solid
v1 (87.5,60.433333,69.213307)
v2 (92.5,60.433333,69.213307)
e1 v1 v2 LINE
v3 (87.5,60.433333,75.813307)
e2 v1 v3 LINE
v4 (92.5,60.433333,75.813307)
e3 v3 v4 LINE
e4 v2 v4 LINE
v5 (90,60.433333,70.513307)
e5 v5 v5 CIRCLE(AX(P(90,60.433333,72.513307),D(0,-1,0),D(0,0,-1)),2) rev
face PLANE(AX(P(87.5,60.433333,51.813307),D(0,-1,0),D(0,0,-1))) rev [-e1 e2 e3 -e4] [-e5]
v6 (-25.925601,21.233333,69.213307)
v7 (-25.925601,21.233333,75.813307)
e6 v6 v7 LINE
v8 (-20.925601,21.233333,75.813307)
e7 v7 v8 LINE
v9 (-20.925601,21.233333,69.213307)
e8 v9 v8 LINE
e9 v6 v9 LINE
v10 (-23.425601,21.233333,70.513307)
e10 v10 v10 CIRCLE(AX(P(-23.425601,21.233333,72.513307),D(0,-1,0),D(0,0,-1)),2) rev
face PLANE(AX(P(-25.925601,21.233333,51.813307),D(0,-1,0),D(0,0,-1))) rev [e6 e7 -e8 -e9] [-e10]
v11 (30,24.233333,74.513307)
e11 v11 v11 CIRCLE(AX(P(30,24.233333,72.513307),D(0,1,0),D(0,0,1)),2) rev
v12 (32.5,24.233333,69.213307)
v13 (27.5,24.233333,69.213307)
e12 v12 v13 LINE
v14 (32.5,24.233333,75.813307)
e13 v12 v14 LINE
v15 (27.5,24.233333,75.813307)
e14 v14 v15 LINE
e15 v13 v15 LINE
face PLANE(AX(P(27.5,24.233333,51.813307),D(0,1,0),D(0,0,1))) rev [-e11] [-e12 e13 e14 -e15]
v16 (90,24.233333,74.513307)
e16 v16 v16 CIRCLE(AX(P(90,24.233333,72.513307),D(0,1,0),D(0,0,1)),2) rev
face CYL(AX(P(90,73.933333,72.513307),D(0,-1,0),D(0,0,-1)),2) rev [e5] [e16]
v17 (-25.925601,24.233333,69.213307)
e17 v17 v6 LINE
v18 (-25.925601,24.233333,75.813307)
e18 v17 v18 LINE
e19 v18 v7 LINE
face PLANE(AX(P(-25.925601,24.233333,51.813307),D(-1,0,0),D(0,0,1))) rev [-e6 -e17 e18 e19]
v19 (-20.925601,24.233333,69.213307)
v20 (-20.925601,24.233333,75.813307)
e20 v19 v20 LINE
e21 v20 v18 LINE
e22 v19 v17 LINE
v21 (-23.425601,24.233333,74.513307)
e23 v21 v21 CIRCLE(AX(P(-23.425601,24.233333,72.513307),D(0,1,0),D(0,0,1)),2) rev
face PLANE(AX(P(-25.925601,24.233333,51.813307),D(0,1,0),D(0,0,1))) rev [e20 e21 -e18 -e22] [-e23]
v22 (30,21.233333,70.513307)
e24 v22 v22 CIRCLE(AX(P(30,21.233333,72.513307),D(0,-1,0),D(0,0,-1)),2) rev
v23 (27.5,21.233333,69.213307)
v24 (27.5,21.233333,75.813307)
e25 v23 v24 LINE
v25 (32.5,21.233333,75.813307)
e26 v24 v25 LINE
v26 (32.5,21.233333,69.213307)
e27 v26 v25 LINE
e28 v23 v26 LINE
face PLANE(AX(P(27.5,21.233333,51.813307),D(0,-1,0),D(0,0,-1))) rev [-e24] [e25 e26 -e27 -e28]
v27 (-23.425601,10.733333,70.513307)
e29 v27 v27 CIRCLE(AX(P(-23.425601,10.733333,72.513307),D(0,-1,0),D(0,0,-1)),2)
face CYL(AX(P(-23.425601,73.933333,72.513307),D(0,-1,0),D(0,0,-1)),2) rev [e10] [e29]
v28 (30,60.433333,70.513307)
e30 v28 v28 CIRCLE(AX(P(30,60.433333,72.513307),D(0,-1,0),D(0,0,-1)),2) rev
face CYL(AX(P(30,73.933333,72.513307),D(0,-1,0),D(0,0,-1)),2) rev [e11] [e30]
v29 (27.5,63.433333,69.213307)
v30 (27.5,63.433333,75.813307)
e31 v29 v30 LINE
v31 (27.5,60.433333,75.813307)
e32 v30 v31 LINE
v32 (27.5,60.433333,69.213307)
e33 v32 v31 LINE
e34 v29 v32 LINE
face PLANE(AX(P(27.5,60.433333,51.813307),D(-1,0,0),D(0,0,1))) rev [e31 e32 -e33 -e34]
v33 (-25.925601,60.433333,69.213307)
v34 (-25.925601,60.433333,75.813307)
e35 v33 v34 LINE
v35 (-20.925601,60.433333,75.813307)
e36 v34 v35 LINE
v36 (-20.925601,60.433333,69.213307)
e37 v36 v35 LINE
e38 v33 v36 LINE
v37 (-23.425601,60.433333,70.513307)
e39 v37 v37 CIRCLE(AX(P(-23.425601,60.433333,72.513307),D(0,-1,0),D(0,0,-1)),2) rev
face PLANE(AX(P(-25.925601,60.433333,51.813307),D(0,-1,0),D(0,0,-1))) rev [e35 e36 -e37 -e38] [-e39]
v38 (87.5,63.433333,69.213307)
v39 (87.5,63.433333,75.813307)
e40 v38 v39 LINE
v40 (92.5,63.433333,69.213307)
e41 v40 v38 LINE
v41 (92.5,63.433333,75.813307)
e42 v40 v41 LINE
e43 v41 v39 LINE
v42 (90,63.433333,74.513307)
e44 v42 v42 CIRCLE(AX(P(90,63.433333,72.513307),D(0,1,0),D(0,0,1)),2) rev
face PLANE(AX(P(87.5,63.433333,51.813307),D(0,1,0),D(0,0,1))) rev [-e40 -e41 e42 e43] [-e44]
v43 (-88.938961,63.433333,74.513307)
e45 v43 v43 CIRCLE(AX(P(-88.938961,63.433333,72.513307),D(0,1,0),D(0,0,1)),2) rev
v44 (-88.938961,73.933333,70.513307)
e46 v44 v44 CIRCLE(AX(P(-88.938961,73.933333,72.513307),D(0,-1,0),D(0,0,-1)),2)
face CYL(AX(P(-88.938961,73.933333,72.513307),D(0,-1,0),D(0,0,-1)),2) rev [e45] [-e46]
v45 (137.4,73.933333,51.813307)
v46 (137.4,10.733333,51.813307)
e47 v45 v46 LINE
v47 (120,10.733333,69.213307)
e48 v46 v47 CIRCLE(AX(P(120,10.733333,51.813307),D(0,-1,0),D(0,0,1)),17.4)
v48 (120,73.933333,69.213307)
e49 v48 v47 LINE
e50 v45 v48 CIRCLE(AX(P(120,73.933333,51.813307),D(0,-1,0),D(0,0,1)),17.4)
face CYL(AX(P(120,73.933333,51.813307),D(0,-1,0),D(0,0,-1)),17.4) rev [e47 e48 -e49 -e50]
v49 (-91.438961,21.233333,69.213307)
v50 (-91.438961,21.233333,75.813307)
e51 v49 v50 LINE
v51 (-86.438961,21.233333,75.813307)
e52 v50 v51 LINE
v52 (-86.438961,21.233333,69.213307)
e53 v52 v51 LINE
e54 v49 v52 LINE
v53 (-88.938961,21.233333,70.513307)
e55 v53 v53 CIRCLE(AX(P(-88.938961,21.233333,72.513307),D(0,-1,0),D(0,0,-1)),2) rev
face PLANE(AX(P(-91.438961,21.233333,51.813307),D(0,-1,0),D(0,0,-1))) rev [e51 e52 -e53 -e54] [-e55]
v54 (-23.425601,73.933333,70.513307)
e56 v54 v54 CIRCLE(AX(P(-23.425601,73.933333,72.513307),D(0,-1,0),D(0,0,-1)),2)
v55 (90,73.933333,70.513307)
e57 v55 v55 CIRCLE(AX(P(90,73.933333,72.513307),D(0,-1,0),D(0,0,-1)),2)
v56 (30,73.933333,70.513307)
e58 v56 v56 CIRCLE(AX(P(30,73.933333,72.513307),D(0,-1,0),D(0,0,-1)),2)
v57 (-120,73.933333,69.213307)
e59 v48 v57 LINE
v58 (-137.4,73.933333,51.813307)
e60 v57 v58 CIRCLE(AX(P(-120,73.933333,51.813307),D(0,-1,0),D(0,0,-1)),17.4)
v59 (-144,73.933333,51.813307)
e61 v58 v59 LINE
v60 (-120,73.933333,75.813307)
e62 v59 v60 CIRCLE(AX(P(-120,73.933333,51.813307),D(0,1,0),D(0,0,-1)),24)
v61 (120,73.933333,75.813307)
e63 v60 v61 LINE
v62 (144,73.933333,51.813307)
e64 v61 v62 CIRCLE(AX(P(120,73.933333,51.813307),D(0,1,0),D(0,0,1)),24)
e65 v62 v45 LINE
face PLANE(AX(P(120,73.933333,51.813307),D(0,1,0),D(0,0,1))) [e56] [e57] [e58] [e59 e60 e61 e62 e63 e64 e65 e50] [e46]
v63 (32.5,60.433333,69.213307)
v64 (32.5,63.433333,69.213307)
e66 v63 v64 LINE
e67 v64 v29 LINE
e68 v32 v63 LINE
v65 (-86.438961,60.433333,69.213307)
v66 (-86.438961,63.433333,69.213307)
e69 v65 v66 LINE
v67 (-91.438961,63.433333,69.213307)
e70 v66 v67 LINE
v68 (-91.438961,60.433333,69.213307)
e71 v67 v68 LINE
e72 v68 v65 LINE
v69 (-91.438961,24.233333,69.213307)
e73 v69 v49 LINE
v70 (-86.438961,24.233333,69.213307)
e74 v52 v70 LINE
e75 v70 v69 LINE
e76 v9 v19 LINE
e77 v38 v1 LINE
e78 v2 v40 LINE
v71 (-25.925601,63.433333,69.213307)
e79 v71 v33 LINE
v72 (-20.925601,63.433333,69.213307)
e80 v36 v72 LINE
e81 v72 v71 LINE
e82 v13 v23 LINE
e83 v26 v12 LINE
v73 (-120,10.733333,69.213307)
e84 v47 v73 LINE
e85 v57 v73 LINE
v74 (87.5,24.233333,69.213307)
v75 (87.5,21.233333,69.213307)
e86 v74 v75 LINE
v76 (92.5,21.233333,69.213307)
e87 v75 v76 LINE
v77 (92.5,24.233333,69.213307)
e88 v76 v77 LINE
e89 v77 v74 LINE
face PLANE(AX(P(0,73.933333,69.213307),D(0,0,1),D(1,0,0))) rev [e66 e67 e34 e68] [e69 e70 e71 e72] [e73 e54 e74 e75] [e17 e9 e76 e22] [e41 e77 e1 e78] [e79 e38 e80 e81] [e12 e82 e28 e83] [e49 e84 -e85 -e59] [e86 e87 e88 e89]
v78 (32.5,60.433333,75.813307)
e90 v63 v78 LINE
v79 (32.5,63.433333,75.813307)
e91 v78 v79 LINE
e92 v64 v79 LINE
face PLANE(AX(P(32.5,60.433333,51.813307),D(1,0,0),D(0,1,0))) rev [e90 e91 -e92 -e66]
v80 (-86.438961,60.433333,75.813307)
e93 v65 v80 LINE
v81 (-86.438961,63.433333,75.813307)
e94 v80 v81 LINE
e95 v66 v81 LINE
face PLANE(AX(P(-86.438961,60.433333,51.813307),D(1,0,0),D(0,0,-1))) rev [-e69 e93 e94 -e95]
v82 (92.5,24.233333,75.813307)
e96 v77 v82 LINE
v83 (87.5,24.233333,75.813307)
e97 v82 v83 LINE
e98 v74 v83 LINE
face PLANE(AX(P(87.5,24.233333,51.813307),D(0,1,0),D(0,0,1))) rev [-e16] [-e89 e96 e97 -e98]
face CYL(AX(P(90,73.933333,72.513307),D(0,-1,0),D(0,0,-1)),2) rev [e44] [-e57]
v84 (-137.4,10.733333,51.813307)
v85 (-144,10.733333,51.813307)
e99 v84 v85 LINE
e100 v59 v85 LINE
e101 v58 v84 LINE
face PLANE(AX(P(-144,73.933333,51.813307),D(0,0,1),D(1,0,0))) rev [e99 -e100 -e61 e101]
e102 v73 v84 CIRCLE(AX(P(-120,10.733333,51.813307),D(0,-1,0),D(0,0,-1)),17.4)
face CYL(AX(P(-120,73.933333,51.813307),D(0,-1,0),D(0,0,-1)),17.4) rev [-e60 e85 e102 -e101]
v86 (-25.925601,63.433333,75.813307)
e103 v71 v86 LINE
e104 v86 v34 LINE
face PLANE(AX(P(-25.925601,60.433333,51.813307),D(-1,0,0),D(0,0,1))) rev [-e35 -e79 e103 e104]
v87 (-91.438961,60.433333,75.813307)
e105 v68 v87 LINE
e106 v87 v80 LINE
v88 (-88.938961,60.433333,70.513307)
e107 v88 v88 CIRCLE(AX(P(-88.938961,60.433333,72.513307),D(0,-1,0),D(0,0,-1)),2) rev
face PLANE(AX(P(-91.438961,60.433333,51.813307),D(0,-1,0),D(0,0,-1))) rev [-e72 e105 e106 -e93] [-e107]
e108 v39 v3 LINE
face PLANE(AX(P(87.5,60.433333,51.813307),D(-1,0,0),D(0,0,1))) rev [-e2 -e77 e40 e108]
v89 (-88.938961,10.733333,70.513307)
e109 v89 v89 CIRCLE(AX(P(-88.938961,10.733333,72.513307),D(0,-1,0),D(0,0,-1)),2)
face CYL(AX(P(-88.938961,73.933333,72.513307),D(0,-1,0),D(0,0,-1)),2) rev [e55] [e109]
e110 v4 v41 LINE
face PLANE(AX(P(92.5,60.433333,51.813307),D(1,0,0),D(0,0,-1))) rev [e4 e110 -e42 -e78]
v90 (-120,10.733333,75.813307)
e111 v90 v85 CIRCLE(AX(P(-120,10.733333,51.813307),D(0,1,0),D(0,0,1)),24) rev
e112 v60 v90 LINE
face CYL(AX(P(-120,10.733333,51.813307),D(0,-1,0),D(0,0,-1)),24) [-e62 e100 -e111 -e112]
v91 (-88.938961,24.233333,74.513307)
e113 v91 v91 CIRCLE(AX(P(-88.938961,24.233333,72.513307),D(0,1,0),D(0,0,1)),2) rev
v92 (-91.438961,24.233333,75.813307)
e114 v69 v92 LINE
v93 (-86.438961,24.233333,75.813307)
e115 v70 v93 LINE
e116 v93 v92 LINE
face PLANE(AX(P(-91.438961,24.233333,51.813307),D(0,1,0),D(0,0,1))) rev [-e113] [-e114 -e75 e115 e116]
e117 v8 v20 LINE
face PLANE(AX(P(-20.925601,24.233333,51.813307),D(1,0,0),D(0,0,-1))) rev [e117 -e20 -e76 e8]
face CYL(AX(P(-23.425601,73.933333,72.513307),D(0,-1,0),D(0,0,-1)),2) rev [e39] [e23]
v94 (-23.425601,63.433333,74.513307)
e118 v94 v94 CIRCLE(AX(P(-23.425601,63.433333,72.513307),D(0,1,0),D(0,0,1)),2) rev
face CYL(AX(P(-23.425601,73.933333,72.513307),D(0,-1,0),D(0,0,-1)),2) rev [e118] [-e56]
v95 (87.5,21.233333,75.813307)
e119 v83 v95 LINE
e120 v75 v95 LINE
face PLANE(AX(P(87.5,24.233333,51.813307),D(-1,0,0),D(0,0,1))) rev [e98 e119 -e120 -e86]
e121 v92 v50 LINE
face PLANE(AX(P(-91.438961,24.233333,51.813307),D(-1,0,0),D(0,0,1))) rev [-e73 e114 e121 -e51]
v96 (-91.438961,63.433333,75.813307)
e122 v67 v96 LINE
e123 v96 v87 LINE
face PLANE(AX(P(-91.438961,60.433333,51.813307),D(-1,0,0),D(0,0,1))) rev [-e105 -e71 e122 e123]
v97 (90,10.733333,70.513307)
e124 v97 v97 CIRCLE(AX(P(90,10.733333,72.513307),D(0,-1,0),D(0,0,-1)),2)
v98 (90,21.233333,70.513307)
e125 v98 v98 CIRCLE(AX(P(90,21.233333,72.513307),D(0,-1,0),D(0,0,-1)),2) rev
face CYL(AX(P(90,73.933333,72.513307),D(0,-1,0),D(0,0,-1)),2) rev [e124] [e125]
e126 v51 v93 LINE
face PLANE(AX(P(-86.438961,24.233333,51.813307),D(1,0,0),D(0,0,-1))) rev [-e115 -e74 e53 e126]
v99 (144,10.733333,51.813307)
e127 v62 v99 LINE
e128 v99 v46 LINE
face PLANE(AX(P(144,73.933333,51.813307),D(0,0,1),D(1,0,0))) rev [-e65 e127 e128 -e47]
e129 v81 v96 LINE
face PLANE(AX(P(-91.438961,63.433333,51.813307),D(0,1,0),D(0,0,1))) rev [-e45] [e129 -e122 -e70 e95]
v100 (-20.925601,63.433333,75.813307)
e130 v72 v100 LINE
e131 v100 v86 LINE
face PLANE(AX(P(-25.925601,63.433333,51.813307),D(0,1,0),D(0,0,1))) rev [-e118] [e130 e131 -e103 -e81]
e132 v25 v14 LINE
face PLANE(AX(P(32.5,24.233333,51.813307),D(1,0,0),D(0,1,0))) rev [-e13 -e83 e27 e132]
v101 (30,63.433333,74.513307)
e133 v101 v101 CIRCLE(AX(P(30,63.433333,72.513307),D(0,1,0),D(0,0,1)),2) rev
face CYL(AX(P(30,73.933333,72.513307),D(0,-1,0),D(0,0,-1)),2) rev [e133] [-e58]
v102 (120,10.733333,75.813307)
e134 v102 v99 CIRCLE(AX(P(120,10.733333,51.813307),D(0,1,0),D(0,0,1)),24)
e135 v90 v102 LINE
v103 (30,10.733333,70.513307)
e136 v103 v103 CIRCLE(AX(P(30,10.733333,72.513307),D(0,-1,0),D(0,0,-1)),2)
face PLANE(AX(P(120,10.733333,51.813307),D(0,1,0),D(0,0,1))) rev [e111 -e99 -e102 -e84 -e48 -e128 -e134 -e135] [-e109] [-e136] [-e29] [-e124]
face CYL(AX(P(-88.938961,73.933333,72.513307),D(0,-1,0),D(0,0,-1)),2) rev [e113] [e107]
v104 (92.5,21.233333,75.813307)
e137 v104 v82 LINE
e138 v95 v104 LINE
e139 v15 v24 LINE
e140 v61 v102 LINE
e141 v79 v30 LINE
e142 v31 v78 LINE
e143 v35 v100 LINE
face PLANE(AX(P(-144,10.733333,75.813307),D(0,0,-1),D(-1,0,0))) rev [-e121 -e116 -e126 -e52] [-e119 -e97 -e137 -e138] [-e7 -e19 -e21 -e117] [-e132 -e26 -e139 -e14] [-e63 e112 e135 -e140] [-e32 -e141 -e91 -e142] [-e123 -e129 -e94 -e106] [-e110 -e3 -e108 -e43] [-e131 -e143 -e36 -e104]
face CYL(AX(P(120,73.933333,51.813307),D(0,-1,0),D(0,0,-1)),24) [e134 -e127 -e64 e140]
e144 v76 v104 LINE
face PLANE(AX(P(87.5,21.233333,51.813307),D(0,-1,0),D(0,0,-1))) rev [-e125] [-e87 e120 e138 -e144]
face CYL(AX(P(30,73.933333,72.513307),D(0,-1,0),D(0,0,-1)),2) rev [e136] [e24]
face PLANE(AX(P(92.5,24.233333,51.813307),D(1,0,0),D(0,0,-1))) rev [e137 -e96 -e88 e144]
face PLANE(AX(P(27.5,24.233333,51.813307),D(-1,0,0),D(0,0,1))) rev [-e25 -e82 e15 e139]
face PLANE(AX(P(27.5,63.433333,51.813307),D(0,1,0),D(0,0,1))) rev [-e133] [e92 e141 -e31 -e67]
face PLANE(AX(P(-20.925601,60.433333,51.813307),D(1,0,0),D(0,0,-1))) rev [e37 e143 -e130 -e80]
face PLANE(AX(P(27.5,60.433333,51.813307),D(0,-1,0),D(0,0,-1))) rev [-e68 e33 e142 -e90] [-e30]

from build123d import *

# Parameters (mm, degrees)
BOSS_EXTRUDE1_DEPTH      = 16
BOSS_EXTRUDE2_DEPTH      = 46.583974855
BOSS_EXTRUDE2_DEPTH_BACK = 46.58397486
SKETCH4_R                = 3.3
CUT_EXTRUDE1_DEPTH       = 32.2
CUT_EXTRUDE1_DEPTH_BACK  = 32.2
SKETCH5_R                = 3.3
SKETCH6_W                = 20
SKETCH6_H                = 11
BOSS_EXTRUDE3_DEPTH      = 30
CUT_EXTRUDE2_DEPTH       = 233.824504724
CUT_EXTRUDE2_DEPTH_BACK  = 233.824504724
SKETCH7_R                = 2
SKETCH8_W                = 40
SKETCH8_H                = 11
CUT_EXTRUDE3_DEPTH       = 40
SKETCH9_R                = 2
CUT_EXTRUDE4_DEPTH       = 40
FILLET1_R                = 20
BOSS_EXTRUDE4_DEPTH      = 52.66666667
SKETCH11_W               = 287.599331825
SKETCH11_H               = 200.78083169
CUT_EXTRUDE5_DEPTH       = 16
SCALE1_START             = 16
SCALE1_DEPTH             = 52.66666667
SCALE1_START_2           = 2.833333333
SCALE1_2_DEPTH           = 79.000000004
SKETCH15_W               = 527.18296214
SKETCH15_H               = 284.392361206
CUT_EXTRUDE9_DEPTH       = 200
SCALE2_SCALE             = 0.8
SKETCH23_R               = 2
CUT_EXTRUDE15_DEPTH      = 175.579201349
SKETCH25_R               = 2
CUT_EXTRUDE18_DEPTH      = 175.579201349
SKETCH28_W               = 5
SKETCH28_H               = 3
CUT_EXTRUDE19_DEPTH      = 164.640269427


# Read off the part's stored shape, not the designer's step: Scale1
with BuildPart() as part:
    # Sketch1 → Boss-Extrude1 (new body)
    with BuildSketch(Plane(origin=(0, 0, 0), x_dir=(1, 0, 0), z_dir=(0, 1, 0))):
        Polygon((-120, -37.5), (-120, -75), (0, -75), (0, 75), (-120, 75), (-120, 37.5), (-220, 37.5), (-220, -37.5), align=None)
    extrude(amount=BOSS_EXTRUDE1_DEPTH)

    # Sketch4 → Boss-Extrude2 (add, two sides: drawn at the far end of the back side and taken through both)
    # profile 1 of 2: a face of its own
    with BuildSketch(Plane.ZY.offset(170).offset(-BOSS_EXTRUDE2_DEPTH_BACK)):
        with BuildLine():
            Line((37.5, 16), (43.5, 16))
            ThreePointArc((43.5, 16), (51.5, 8), (43.5, 0))
            Line((43.5, 0), (37.5, 0))
            Line((37.5, 0), (37.5, 16))
        make_face()
        with Locations((43.5, 8)):
            Circle(SKETCH4_R, mode=Mode.SUBTRACT)
    # profile 2 of 2: a face of its own
    with BuildSketch(Plane.ZY.offset(170).offset(-BOSS_EXTRUDE2_DEPTH_BACK)):
        with BuildLine():
            Line((-37.5, 0), (-43.5, 0))
            ThreePointArc((-43.5, 0), (-51.5, 8), (-43.5, 16))
            Line((-43.5, 16), (-37.5, 16))
            Line((-37.5, 16), (-37.5, 0))
        make_face()
        with Locations((-43.5, 8)):
            Circle(SKETCH4_R, mode=Mode.SUBTRACT)
    extrude(amount=BOSS_EXTRUDE2_DEPTH + BOSS_EXTRUDE2_DEPTH_BACK)

    # Sketch5 → Cut-Extrude1 (cut, two sides: drawn at the far end of the back side and taken through both)
    # profile 1 of 2: a face of its own
    with BuildSketch(Plane.ZY.offset(170).offset(-CUT_EXTRUDE1_DEPTH_BACK)):
        with BuildLine():
            Line((-43.5, 16), (-37.5, 16))
            Line((-37.5, 16), (-37.5, 0))
            Line((-37.5, 0), (-43.5, 0))
            ThreePointArc((-43.5, 0), (-51.5, 8), (-43.5, 16))
        make_face()
        with Locations((-43.5, 8)):
            Circle(SKETCH5_R, mode=Mode.SUBTRACT)
    # profile 2 of 2: a face of its own
    with BuildSketch(Plane.ZY.offset(170).offset(-CUT_EXTRUDE1_DEPTH_BACK)):
        with BuildLine():
            Line((37.5, 0), (43.5, 0))
            ThreePointArc((43.5, 0), (51.5, 8), (43.5, 16))
            Line((43.5, 16), (37.5, 16))
            Line((37.5, 16), (37.5, 0))
        make_face()
        with Locations((43.5, 8)):
            Circle(SKETCH5_R, mode=Mode.SUBTRACT)
    extrude(amount=CUT_EXTRUDE1_DEPTH + CUT_EXTRUDE1_DEPTH_BACK, mode=Mode.SUBTRACT)

    # Sketch6 → Boss-Extrude3 (add)
    with BuildSketch(Plane(origin=(0, 0, 0), x_dir=(0, 0, -1), z_dir=(1, 0, 0))):
        with Locations((-50, 8)):
            Rectangle(SKETCH6_W, SKETCH6_H)
        with Locations((50, 8)):
            Rectangle(SKETCH6_W, SKETCH6_H)
    extrude(amount=BOSS_EXTRUDE3_DEPTH)

    # Sketch7 → Cut-Extrude2 (cut, two sides: drawn at the far end of the back side and taken through both)
    with BuildSketch(Plane(origin=(0, 13.5, 0), x_dir=(1, 0, 0), z_dir=(0, 1, 0)).offset(-CUT_EXTRUDE2_DEPTH_BACK)):
        with Locations(Location((22.5, 50, 0), (0, 0, 270))):
            Circle(SKETCH7_R)
        with Locations(Location((22.5, -50, 0), (0, 0, 270))):
            Circle(SKETCH7_R)
    extrude(amount=CUT_EXTRUDE2_DEPTH + CUT_EXTRUDE2_DEPTH_BACK, mode=Mode.SUBTRACT)

    # Sketch8 → Cut-Extrude3 (cut)
    with BuildSketch(Plane(origin=(0, 0, 0), x_dir=(0, 0, -1), z_dir=(1, 0, 0))):
        with Locations((0, 8)):
            Rectangle(SKETCH8_W, SKETCH8_H)
    extrude(amount=-CUT_EXTRUDE3_DEPTH, mode=Mode.SUBTRACT)

    # Sketch9 → Cut-Extrude4 (cut)
    with BuildSketch(Plane(origin=(0, 16, 0), x_dir=(1, 0, 0), z_dir=(0, 1, 0))):
        with Locations(Location((-32.5, 0, 0), (0, 0, 270))):
            Circle(SKETCH9_R)
    extrude(amount=-CUT_EXTRUDE4_DEPTH, mode=Mode.SUBTRACT)

    # Fillet1
    # the kernel refuses this fillet: 20 mm, written as the material it takes off along each edge
    with BuildSketch(Plane(origin=(-220, -27.947694226, -37.5), x_dir=(0, 0, 1), z_dir=(0, 1, 0))) as fillet1_piece_1:
        with BuildLine():
            CenterArc((11.17907769, 20), FILLET1_R, 236.01651728, 33.98348272)
            Line((0, 3.416025145), (-0.223581554, 3.084345648))
            ThreePointArc((-0.223581554, 3.084345648), (-0.4, 1.708012572), (-0.4, 0))
            Line((-0.4, 0), (0, -0.4))
            Line((0, -0.4), (11.17907769, -0.4))
            Line((11.17907769, -0.4), (11.17907769, 0))
        make_face()
    extrude(amount=71.895388452, mode=Mode.SUBTRACT)
    with BuildSketch(Plane(origin=(-220, -27.947694226, 37.5), x_dir=(1, 0, 0), z_dir=(0, 1, 0))) as fillet1_piece_2:
        with BuildLine():
            CenterArc((20, 11.17907769), FILLET1_R, 180, 33.98348272)
            Line((0, 11.17907769), (-0.4, 11.17907769))
            Line((-0.4, 11.17907769), (-0.4, 0))
            Line((-0.4, 0), (0, -0.4))
            ThreePointArc((0, -0.4), (1.708012572, -0.4), (3.084345648, -0.223581554))
            Line((3.084345648, -0.223581554), (3.416025145, 0))
        make_face()
    extrude(amount=71.895388452, mode=Mode.SUBTRACT)
    with BuildSketch(Plane(origin=(-120, -50, -75), x_dir=(1, 0, 0), z_dir=(0, 1, 0)), Plane(origin=(-120, -50, 75), x_dir=(0, 0, -1), z_dir=(0, 1, 0))) as fillet1_piece_3:
        with BuildLine():
            CenterArc((FILLET1_R, -FILLET1_R), FILLET1_R, 90, 90)
            Line((0, -FILLET1_R), (-FILLET1_R * 0.02, -FILLET1_R))
            Line((-FILLET1_R * 0.02, -FILLET1_R), (-FILLET1_R * 0.02, FILLET1_R * 0.02))
            Line((-FILLET1_R * 0.02, FILLET1_R * 0.02), (FILLET1_R, FILLET1_R * 0.02))
            Line((FILLET1_R, FILLET1_R * 0.02), (FILLET1_R, 0))
        make_face()
    extrude(amount=116, mode=Mode.SUBTRACT)

    # Sketch10 → Boss-Extrude4 (add)
    with BuildSketch(Plane(origin=(0, 16, 0), x_dir=(1, 0, 0), z_dir=(0, 1, 0))):
        with BuildLine():
            Line((0, 69.5), (-100, 69.5))
            ThreePointArc((-100, 69.5), (-110.253048327, 65.253048327), (-114.5, 55))
            Line((-114.5, 55), (-120, 55))
            ThreePointArc((-120, 55), (-114.142135624, 69.142135624), (-100, 75))
            Line((-100, 75), (0, 75))
            Line((0, 75), (100, 75))
            ThreePointArc((100, 75), (114.142135624, 69.142135624), (120, 55))
            Line((120, 55), (114.5, 55))
            ThreePointArc((114.5, 55), (110.253048327, 65.253048327), (100, 69.5))
            Line((100, 69.5), (0, 69.5))
        make_face()
        with BuildLine():
            Line((0, -75), (100, -75))
            ThreePointArc((100, -75), (114.142135624, -69.142135624), (120, -55))
            Line((120, -55), (114.5, -55))
            ThreePointArc((114.5, -55), (110.253048327, -65.253048327), (100, -69.5))
            Line((100, -69.5), (0, -69.5))
            Line((0, -69.5), (-100, -69.5))
            ThreePointArc((-100, -69.5), (-110.253048327, -65.253048327), (-114.5, -55))
            Line((-114.5, -55), (-120, -55))
            ThreePointArc((-120, -55), (-114.142135624, -69.142135624), (-100, -75))
            Line((-100, -75), (0, -75))
        make_face()
    extrude(amount=BOSS_EXTRUDE4_DEPTH)

    # Sketch11 → Cut-Extrude5 (cut)
    with BuildSketch(Plane.XZ):
        with Locations((-109.164099046, 3.949352656)):
            Rectangle(SKETCH11_W, SKETCH11_H)
    extrude(amount=-CUT_EXTRUDE5_DEPTH, mode=Mode.SUBTRACT)


with BuildPart() as cut_extrude5_piece_1:
    # of the separate pieces the step leaves, piece 1, a body of its own (cut_extrude5_pieces)
    add(part.part.solids().sort_by_distance((-100, 16, 75))[0])


with BuildPart() as cut_extrude5_piece_2:
    # of the separate pieces the step leaves, piece 2, a body of its own (cut_extrude5_pieces)
    add(part.part.solids().sort_by_distance((-114.5, 16, -55))[0])


with BuildPart() as scale1_tool:
    # Scale1 outline → Scale1 (new body)
    with BuildSketch(Plane(origin=(0, 0, 0), x_dir=(1, 0, 0), z_dir=(0, 1, 0)).offset(SCALE1_START)):
        with BuildLine():
            Line((104.502391105, -68.783267912), (114.492119434, -68.783267912))
            ThreePointArc((114.492119434, -68.783267912), (118.572054123, -62.421509662), (120, -55))
            Line((120, -55), (114.5, -55))
            ThreePointArc((114.5, -55), (111.737433088, -63.513675146), (104.502391105, -68.783267912))
        make_face()
        with BuildLine():
            Line((-114.492119434, -68.783267912), (-104.502391105, -68.783267912))
            ThreePointArc((-104.502391105, -68.783267912), (-111.737433088, -63.513675146), (-114.5, -55))
            Line((-114.5, -55), (-120, -55))
            ThreePointArc((-120, -55), (-118.572054123, -62.421509662), (-114.492119434, -68.783267912))
        make_face()
        with BuildLine():
            Line((-104.502391105, 68.783267912), (-114.492119434, 68.783267912))
            ThreePointArc((-114.492119434, 68.783267912), (-118.572054123, 62.421509662), (-120, 55))
            Line((-120, 55), (-114.5, 55))
            ThreePointArc((-114.5, 55), (-111.737433088, 63.513675146), (-104.502391105, 68.783267912))
        make_face()
        with BuildLine():
            ThreePointArc((120, 55), (118.572054123, 62.421509662), (114.492119434, 68.783267912))
            Line((114.492119434, 68.783267912), (104.502391105, 68.783267912))
            ThreePointArc((104.502391105, 68.783267912), (111.737433088, 63.513675146), (114.5, 55))
            Line((114.5, 55), (120, 55))
        make_face()
    extrude(amount=SCALE1_DEPTH)


with BuildPart() as cut_extrude5_piece_1_1:
    add(cut_extrude5_piece_1.part)

    # Scale1: cut by scale1_tool
    add(scale1_tool.part, mode=Mode.SUBTRACT)



with BuildPart() as cut_extrude5_piece_2_1:
    add(cut_extrude5_piece_2.part)

    # Scale1: cut by scale1_tool
    add(scale1_tool.part, mode=Mode.SUBTRACT)


with BuildPart() as cut_extrude5_piece_1_2:
    add(cut_extrude5_piece_1_1.part)

    add(cut_extrude5_piece_2_1.part)  # Scale1 2 merges Cut-Extrude5 piece 2
    # Scale1 2 outline → Scale1 2 (add)
    with BuildSketch(Plane(origin=(0, 0, 0), x_dir=(1, 0, 0), z_dir=(0, 1, 0)).offset(SCALE1_START_2)):
        with BuildLine():
            Line((180, -47.033267912), (171.75, -47.033267912))
            ThreePointArc((171.75, -47.033267912), (165.379572491, -62.412840403), (150, -68.783267912))
            Line((150, -68.783267912), (-150, -68.783267912))
            ThreePointArc((-150, -68.783267912), (-165.379572491, -62.412840403), (-171.75, -47.033267912))
            Line((-171.75, -47.033267912), (-180, -47.033267912))
            ThreePointArc((-180, -47.033267912), (-171.213203436, -68.246471348), (-150, -77.033267912))
            Line((-150, -77.033267912), (150, -77.033267912))
            ThreePointArc((150, -77.033267912), (171.213203436, -68.246471348), (180, -47.033267912))
        make_face()
        with BuildLine():
            Line((150, 77.033267912), (-150, 77.033267912))
            ThreePointArc((-150, 77.033267912), (-171.213203436, 68.246471348), (-180, 47.033267912))
            Line((-180, 47.033267912), (-171.75, 47.033267912))
            ThreePointArc((-171.75, 47.033267912), (-165.379572491, 62.412840403), (-150, 68.783267912))
            Line((-150, 68.783267912), (150, 68.783267912))
            ThreePointArc((150, 68.783267912), (165.379572491, 62.412840403), (171.75, 47.033267912))
            Line((171.75, 47.033267912), (180, 47.033267912))
            ThreePointArc((180, 47.033267912), (171.213203436, 68.246471348), (150, 77.033267912))
        make_face()
    extrude(amount=SCALE1_2_DEPTH)

    # Sketch15 → Cut-Extrude9 (cut)
    with BuildSketch(Plane.XY):
        with Locations((-4.944471508, 47.534491158)):
            Rectangle(SKETCH15_W, SKETCH15_H)
    extrude(amount=-CUT_EXTRUDE9_DEPTH, mode=Mode.SUBTRACT)


with BuildPart() as cut_extrude5_piece_1_3:
    # Scale2: scaled about (0, 42.333333335, 70.933464176)
    add(cut_extrude5_piece_1_2.part.scale(SCALE2_SCALE).moved(Location((0, 8.466666667, 14.186692835))))

    # Sketch23 → Cut-Extrude15 (cut, through all)
    with BuildSketch(Plane.XZ.offset(-10.733333333)):
        with Locations(Location((-88.93896071, 72.513307165, 0), (0, 0, 270))):
            Circle(SKETCH23_R)
    extrude(amount=-CUT_EXTRUDE15_DEPTH, mode=Mode.SUBTRACT)

    # Sketch25 → Cut-Extrude18 (cut, through all)
    with BuildSketch(Plane.XZ.offset(-10.733333333)):
        with Locations(Location((-23.42560053, 72.513307165, 0), (0, 0, 270))):
            Circle(SKETCH25_R)
        with Locations(Location((30, 72.513307165, 0), (0, 0, 270))):
            Circle(SKETCH25_R)
        with Locations(Location((-88.93896071, 72.513307165, 0), (0, 0, 270))):
            Circle(SKETCH25_R)
        with Locations(Location((90, 72.513307165, 0), (0, 0, 270))):
            Circle(SKETCH25_R)
    extrude(amount=-CUT_EXTRUDE18_DEPTH, mode=Mode.SUBTRACT)

    # Sketch28 → Cut-Extrude19 (cut, through all)
    with BuildSketch(Plane.XY.offset(75.813307165)):
        with Locations((-88.93896071, 22.733333333)):
            Rectangle(SKETCH28_W, SKETCH28_H)
        with Locations((-23.42560053, 22.733333333)):
            Rectangle(SKETCH28_W, SKETCH28_H)
        with Locations((30, 22.733333333)):
            Rectangle(SKETCH28_W, SKETCH28_H)
        with Locations((90, 22.733333333)):
            Rectangle(SKETCH28_W, SKETCH28_H)
        with Locations((90, 61.933333337)):
            Rectangle(SKETCH28_W, SKETCH28_H)
        with Locations((30, 61.933333337)):
            Rectangle(SKETCH28_W, SKETCH28_H)
        with Locations((-23.42560053, 61.933333337)):
            Rectangle(SKETCH28_W, SKETCH28_H)
        with Locations((-88.93896071, 61.933333337)):
            Rectangle(SKETCH28_W, SKETCH28_H)
    extrude(amount=-CUT_EXTRUDE19_DEPTH, mode=Mode.SUBTRACT)


solid = cut_extrude5_piece_1_3.part
